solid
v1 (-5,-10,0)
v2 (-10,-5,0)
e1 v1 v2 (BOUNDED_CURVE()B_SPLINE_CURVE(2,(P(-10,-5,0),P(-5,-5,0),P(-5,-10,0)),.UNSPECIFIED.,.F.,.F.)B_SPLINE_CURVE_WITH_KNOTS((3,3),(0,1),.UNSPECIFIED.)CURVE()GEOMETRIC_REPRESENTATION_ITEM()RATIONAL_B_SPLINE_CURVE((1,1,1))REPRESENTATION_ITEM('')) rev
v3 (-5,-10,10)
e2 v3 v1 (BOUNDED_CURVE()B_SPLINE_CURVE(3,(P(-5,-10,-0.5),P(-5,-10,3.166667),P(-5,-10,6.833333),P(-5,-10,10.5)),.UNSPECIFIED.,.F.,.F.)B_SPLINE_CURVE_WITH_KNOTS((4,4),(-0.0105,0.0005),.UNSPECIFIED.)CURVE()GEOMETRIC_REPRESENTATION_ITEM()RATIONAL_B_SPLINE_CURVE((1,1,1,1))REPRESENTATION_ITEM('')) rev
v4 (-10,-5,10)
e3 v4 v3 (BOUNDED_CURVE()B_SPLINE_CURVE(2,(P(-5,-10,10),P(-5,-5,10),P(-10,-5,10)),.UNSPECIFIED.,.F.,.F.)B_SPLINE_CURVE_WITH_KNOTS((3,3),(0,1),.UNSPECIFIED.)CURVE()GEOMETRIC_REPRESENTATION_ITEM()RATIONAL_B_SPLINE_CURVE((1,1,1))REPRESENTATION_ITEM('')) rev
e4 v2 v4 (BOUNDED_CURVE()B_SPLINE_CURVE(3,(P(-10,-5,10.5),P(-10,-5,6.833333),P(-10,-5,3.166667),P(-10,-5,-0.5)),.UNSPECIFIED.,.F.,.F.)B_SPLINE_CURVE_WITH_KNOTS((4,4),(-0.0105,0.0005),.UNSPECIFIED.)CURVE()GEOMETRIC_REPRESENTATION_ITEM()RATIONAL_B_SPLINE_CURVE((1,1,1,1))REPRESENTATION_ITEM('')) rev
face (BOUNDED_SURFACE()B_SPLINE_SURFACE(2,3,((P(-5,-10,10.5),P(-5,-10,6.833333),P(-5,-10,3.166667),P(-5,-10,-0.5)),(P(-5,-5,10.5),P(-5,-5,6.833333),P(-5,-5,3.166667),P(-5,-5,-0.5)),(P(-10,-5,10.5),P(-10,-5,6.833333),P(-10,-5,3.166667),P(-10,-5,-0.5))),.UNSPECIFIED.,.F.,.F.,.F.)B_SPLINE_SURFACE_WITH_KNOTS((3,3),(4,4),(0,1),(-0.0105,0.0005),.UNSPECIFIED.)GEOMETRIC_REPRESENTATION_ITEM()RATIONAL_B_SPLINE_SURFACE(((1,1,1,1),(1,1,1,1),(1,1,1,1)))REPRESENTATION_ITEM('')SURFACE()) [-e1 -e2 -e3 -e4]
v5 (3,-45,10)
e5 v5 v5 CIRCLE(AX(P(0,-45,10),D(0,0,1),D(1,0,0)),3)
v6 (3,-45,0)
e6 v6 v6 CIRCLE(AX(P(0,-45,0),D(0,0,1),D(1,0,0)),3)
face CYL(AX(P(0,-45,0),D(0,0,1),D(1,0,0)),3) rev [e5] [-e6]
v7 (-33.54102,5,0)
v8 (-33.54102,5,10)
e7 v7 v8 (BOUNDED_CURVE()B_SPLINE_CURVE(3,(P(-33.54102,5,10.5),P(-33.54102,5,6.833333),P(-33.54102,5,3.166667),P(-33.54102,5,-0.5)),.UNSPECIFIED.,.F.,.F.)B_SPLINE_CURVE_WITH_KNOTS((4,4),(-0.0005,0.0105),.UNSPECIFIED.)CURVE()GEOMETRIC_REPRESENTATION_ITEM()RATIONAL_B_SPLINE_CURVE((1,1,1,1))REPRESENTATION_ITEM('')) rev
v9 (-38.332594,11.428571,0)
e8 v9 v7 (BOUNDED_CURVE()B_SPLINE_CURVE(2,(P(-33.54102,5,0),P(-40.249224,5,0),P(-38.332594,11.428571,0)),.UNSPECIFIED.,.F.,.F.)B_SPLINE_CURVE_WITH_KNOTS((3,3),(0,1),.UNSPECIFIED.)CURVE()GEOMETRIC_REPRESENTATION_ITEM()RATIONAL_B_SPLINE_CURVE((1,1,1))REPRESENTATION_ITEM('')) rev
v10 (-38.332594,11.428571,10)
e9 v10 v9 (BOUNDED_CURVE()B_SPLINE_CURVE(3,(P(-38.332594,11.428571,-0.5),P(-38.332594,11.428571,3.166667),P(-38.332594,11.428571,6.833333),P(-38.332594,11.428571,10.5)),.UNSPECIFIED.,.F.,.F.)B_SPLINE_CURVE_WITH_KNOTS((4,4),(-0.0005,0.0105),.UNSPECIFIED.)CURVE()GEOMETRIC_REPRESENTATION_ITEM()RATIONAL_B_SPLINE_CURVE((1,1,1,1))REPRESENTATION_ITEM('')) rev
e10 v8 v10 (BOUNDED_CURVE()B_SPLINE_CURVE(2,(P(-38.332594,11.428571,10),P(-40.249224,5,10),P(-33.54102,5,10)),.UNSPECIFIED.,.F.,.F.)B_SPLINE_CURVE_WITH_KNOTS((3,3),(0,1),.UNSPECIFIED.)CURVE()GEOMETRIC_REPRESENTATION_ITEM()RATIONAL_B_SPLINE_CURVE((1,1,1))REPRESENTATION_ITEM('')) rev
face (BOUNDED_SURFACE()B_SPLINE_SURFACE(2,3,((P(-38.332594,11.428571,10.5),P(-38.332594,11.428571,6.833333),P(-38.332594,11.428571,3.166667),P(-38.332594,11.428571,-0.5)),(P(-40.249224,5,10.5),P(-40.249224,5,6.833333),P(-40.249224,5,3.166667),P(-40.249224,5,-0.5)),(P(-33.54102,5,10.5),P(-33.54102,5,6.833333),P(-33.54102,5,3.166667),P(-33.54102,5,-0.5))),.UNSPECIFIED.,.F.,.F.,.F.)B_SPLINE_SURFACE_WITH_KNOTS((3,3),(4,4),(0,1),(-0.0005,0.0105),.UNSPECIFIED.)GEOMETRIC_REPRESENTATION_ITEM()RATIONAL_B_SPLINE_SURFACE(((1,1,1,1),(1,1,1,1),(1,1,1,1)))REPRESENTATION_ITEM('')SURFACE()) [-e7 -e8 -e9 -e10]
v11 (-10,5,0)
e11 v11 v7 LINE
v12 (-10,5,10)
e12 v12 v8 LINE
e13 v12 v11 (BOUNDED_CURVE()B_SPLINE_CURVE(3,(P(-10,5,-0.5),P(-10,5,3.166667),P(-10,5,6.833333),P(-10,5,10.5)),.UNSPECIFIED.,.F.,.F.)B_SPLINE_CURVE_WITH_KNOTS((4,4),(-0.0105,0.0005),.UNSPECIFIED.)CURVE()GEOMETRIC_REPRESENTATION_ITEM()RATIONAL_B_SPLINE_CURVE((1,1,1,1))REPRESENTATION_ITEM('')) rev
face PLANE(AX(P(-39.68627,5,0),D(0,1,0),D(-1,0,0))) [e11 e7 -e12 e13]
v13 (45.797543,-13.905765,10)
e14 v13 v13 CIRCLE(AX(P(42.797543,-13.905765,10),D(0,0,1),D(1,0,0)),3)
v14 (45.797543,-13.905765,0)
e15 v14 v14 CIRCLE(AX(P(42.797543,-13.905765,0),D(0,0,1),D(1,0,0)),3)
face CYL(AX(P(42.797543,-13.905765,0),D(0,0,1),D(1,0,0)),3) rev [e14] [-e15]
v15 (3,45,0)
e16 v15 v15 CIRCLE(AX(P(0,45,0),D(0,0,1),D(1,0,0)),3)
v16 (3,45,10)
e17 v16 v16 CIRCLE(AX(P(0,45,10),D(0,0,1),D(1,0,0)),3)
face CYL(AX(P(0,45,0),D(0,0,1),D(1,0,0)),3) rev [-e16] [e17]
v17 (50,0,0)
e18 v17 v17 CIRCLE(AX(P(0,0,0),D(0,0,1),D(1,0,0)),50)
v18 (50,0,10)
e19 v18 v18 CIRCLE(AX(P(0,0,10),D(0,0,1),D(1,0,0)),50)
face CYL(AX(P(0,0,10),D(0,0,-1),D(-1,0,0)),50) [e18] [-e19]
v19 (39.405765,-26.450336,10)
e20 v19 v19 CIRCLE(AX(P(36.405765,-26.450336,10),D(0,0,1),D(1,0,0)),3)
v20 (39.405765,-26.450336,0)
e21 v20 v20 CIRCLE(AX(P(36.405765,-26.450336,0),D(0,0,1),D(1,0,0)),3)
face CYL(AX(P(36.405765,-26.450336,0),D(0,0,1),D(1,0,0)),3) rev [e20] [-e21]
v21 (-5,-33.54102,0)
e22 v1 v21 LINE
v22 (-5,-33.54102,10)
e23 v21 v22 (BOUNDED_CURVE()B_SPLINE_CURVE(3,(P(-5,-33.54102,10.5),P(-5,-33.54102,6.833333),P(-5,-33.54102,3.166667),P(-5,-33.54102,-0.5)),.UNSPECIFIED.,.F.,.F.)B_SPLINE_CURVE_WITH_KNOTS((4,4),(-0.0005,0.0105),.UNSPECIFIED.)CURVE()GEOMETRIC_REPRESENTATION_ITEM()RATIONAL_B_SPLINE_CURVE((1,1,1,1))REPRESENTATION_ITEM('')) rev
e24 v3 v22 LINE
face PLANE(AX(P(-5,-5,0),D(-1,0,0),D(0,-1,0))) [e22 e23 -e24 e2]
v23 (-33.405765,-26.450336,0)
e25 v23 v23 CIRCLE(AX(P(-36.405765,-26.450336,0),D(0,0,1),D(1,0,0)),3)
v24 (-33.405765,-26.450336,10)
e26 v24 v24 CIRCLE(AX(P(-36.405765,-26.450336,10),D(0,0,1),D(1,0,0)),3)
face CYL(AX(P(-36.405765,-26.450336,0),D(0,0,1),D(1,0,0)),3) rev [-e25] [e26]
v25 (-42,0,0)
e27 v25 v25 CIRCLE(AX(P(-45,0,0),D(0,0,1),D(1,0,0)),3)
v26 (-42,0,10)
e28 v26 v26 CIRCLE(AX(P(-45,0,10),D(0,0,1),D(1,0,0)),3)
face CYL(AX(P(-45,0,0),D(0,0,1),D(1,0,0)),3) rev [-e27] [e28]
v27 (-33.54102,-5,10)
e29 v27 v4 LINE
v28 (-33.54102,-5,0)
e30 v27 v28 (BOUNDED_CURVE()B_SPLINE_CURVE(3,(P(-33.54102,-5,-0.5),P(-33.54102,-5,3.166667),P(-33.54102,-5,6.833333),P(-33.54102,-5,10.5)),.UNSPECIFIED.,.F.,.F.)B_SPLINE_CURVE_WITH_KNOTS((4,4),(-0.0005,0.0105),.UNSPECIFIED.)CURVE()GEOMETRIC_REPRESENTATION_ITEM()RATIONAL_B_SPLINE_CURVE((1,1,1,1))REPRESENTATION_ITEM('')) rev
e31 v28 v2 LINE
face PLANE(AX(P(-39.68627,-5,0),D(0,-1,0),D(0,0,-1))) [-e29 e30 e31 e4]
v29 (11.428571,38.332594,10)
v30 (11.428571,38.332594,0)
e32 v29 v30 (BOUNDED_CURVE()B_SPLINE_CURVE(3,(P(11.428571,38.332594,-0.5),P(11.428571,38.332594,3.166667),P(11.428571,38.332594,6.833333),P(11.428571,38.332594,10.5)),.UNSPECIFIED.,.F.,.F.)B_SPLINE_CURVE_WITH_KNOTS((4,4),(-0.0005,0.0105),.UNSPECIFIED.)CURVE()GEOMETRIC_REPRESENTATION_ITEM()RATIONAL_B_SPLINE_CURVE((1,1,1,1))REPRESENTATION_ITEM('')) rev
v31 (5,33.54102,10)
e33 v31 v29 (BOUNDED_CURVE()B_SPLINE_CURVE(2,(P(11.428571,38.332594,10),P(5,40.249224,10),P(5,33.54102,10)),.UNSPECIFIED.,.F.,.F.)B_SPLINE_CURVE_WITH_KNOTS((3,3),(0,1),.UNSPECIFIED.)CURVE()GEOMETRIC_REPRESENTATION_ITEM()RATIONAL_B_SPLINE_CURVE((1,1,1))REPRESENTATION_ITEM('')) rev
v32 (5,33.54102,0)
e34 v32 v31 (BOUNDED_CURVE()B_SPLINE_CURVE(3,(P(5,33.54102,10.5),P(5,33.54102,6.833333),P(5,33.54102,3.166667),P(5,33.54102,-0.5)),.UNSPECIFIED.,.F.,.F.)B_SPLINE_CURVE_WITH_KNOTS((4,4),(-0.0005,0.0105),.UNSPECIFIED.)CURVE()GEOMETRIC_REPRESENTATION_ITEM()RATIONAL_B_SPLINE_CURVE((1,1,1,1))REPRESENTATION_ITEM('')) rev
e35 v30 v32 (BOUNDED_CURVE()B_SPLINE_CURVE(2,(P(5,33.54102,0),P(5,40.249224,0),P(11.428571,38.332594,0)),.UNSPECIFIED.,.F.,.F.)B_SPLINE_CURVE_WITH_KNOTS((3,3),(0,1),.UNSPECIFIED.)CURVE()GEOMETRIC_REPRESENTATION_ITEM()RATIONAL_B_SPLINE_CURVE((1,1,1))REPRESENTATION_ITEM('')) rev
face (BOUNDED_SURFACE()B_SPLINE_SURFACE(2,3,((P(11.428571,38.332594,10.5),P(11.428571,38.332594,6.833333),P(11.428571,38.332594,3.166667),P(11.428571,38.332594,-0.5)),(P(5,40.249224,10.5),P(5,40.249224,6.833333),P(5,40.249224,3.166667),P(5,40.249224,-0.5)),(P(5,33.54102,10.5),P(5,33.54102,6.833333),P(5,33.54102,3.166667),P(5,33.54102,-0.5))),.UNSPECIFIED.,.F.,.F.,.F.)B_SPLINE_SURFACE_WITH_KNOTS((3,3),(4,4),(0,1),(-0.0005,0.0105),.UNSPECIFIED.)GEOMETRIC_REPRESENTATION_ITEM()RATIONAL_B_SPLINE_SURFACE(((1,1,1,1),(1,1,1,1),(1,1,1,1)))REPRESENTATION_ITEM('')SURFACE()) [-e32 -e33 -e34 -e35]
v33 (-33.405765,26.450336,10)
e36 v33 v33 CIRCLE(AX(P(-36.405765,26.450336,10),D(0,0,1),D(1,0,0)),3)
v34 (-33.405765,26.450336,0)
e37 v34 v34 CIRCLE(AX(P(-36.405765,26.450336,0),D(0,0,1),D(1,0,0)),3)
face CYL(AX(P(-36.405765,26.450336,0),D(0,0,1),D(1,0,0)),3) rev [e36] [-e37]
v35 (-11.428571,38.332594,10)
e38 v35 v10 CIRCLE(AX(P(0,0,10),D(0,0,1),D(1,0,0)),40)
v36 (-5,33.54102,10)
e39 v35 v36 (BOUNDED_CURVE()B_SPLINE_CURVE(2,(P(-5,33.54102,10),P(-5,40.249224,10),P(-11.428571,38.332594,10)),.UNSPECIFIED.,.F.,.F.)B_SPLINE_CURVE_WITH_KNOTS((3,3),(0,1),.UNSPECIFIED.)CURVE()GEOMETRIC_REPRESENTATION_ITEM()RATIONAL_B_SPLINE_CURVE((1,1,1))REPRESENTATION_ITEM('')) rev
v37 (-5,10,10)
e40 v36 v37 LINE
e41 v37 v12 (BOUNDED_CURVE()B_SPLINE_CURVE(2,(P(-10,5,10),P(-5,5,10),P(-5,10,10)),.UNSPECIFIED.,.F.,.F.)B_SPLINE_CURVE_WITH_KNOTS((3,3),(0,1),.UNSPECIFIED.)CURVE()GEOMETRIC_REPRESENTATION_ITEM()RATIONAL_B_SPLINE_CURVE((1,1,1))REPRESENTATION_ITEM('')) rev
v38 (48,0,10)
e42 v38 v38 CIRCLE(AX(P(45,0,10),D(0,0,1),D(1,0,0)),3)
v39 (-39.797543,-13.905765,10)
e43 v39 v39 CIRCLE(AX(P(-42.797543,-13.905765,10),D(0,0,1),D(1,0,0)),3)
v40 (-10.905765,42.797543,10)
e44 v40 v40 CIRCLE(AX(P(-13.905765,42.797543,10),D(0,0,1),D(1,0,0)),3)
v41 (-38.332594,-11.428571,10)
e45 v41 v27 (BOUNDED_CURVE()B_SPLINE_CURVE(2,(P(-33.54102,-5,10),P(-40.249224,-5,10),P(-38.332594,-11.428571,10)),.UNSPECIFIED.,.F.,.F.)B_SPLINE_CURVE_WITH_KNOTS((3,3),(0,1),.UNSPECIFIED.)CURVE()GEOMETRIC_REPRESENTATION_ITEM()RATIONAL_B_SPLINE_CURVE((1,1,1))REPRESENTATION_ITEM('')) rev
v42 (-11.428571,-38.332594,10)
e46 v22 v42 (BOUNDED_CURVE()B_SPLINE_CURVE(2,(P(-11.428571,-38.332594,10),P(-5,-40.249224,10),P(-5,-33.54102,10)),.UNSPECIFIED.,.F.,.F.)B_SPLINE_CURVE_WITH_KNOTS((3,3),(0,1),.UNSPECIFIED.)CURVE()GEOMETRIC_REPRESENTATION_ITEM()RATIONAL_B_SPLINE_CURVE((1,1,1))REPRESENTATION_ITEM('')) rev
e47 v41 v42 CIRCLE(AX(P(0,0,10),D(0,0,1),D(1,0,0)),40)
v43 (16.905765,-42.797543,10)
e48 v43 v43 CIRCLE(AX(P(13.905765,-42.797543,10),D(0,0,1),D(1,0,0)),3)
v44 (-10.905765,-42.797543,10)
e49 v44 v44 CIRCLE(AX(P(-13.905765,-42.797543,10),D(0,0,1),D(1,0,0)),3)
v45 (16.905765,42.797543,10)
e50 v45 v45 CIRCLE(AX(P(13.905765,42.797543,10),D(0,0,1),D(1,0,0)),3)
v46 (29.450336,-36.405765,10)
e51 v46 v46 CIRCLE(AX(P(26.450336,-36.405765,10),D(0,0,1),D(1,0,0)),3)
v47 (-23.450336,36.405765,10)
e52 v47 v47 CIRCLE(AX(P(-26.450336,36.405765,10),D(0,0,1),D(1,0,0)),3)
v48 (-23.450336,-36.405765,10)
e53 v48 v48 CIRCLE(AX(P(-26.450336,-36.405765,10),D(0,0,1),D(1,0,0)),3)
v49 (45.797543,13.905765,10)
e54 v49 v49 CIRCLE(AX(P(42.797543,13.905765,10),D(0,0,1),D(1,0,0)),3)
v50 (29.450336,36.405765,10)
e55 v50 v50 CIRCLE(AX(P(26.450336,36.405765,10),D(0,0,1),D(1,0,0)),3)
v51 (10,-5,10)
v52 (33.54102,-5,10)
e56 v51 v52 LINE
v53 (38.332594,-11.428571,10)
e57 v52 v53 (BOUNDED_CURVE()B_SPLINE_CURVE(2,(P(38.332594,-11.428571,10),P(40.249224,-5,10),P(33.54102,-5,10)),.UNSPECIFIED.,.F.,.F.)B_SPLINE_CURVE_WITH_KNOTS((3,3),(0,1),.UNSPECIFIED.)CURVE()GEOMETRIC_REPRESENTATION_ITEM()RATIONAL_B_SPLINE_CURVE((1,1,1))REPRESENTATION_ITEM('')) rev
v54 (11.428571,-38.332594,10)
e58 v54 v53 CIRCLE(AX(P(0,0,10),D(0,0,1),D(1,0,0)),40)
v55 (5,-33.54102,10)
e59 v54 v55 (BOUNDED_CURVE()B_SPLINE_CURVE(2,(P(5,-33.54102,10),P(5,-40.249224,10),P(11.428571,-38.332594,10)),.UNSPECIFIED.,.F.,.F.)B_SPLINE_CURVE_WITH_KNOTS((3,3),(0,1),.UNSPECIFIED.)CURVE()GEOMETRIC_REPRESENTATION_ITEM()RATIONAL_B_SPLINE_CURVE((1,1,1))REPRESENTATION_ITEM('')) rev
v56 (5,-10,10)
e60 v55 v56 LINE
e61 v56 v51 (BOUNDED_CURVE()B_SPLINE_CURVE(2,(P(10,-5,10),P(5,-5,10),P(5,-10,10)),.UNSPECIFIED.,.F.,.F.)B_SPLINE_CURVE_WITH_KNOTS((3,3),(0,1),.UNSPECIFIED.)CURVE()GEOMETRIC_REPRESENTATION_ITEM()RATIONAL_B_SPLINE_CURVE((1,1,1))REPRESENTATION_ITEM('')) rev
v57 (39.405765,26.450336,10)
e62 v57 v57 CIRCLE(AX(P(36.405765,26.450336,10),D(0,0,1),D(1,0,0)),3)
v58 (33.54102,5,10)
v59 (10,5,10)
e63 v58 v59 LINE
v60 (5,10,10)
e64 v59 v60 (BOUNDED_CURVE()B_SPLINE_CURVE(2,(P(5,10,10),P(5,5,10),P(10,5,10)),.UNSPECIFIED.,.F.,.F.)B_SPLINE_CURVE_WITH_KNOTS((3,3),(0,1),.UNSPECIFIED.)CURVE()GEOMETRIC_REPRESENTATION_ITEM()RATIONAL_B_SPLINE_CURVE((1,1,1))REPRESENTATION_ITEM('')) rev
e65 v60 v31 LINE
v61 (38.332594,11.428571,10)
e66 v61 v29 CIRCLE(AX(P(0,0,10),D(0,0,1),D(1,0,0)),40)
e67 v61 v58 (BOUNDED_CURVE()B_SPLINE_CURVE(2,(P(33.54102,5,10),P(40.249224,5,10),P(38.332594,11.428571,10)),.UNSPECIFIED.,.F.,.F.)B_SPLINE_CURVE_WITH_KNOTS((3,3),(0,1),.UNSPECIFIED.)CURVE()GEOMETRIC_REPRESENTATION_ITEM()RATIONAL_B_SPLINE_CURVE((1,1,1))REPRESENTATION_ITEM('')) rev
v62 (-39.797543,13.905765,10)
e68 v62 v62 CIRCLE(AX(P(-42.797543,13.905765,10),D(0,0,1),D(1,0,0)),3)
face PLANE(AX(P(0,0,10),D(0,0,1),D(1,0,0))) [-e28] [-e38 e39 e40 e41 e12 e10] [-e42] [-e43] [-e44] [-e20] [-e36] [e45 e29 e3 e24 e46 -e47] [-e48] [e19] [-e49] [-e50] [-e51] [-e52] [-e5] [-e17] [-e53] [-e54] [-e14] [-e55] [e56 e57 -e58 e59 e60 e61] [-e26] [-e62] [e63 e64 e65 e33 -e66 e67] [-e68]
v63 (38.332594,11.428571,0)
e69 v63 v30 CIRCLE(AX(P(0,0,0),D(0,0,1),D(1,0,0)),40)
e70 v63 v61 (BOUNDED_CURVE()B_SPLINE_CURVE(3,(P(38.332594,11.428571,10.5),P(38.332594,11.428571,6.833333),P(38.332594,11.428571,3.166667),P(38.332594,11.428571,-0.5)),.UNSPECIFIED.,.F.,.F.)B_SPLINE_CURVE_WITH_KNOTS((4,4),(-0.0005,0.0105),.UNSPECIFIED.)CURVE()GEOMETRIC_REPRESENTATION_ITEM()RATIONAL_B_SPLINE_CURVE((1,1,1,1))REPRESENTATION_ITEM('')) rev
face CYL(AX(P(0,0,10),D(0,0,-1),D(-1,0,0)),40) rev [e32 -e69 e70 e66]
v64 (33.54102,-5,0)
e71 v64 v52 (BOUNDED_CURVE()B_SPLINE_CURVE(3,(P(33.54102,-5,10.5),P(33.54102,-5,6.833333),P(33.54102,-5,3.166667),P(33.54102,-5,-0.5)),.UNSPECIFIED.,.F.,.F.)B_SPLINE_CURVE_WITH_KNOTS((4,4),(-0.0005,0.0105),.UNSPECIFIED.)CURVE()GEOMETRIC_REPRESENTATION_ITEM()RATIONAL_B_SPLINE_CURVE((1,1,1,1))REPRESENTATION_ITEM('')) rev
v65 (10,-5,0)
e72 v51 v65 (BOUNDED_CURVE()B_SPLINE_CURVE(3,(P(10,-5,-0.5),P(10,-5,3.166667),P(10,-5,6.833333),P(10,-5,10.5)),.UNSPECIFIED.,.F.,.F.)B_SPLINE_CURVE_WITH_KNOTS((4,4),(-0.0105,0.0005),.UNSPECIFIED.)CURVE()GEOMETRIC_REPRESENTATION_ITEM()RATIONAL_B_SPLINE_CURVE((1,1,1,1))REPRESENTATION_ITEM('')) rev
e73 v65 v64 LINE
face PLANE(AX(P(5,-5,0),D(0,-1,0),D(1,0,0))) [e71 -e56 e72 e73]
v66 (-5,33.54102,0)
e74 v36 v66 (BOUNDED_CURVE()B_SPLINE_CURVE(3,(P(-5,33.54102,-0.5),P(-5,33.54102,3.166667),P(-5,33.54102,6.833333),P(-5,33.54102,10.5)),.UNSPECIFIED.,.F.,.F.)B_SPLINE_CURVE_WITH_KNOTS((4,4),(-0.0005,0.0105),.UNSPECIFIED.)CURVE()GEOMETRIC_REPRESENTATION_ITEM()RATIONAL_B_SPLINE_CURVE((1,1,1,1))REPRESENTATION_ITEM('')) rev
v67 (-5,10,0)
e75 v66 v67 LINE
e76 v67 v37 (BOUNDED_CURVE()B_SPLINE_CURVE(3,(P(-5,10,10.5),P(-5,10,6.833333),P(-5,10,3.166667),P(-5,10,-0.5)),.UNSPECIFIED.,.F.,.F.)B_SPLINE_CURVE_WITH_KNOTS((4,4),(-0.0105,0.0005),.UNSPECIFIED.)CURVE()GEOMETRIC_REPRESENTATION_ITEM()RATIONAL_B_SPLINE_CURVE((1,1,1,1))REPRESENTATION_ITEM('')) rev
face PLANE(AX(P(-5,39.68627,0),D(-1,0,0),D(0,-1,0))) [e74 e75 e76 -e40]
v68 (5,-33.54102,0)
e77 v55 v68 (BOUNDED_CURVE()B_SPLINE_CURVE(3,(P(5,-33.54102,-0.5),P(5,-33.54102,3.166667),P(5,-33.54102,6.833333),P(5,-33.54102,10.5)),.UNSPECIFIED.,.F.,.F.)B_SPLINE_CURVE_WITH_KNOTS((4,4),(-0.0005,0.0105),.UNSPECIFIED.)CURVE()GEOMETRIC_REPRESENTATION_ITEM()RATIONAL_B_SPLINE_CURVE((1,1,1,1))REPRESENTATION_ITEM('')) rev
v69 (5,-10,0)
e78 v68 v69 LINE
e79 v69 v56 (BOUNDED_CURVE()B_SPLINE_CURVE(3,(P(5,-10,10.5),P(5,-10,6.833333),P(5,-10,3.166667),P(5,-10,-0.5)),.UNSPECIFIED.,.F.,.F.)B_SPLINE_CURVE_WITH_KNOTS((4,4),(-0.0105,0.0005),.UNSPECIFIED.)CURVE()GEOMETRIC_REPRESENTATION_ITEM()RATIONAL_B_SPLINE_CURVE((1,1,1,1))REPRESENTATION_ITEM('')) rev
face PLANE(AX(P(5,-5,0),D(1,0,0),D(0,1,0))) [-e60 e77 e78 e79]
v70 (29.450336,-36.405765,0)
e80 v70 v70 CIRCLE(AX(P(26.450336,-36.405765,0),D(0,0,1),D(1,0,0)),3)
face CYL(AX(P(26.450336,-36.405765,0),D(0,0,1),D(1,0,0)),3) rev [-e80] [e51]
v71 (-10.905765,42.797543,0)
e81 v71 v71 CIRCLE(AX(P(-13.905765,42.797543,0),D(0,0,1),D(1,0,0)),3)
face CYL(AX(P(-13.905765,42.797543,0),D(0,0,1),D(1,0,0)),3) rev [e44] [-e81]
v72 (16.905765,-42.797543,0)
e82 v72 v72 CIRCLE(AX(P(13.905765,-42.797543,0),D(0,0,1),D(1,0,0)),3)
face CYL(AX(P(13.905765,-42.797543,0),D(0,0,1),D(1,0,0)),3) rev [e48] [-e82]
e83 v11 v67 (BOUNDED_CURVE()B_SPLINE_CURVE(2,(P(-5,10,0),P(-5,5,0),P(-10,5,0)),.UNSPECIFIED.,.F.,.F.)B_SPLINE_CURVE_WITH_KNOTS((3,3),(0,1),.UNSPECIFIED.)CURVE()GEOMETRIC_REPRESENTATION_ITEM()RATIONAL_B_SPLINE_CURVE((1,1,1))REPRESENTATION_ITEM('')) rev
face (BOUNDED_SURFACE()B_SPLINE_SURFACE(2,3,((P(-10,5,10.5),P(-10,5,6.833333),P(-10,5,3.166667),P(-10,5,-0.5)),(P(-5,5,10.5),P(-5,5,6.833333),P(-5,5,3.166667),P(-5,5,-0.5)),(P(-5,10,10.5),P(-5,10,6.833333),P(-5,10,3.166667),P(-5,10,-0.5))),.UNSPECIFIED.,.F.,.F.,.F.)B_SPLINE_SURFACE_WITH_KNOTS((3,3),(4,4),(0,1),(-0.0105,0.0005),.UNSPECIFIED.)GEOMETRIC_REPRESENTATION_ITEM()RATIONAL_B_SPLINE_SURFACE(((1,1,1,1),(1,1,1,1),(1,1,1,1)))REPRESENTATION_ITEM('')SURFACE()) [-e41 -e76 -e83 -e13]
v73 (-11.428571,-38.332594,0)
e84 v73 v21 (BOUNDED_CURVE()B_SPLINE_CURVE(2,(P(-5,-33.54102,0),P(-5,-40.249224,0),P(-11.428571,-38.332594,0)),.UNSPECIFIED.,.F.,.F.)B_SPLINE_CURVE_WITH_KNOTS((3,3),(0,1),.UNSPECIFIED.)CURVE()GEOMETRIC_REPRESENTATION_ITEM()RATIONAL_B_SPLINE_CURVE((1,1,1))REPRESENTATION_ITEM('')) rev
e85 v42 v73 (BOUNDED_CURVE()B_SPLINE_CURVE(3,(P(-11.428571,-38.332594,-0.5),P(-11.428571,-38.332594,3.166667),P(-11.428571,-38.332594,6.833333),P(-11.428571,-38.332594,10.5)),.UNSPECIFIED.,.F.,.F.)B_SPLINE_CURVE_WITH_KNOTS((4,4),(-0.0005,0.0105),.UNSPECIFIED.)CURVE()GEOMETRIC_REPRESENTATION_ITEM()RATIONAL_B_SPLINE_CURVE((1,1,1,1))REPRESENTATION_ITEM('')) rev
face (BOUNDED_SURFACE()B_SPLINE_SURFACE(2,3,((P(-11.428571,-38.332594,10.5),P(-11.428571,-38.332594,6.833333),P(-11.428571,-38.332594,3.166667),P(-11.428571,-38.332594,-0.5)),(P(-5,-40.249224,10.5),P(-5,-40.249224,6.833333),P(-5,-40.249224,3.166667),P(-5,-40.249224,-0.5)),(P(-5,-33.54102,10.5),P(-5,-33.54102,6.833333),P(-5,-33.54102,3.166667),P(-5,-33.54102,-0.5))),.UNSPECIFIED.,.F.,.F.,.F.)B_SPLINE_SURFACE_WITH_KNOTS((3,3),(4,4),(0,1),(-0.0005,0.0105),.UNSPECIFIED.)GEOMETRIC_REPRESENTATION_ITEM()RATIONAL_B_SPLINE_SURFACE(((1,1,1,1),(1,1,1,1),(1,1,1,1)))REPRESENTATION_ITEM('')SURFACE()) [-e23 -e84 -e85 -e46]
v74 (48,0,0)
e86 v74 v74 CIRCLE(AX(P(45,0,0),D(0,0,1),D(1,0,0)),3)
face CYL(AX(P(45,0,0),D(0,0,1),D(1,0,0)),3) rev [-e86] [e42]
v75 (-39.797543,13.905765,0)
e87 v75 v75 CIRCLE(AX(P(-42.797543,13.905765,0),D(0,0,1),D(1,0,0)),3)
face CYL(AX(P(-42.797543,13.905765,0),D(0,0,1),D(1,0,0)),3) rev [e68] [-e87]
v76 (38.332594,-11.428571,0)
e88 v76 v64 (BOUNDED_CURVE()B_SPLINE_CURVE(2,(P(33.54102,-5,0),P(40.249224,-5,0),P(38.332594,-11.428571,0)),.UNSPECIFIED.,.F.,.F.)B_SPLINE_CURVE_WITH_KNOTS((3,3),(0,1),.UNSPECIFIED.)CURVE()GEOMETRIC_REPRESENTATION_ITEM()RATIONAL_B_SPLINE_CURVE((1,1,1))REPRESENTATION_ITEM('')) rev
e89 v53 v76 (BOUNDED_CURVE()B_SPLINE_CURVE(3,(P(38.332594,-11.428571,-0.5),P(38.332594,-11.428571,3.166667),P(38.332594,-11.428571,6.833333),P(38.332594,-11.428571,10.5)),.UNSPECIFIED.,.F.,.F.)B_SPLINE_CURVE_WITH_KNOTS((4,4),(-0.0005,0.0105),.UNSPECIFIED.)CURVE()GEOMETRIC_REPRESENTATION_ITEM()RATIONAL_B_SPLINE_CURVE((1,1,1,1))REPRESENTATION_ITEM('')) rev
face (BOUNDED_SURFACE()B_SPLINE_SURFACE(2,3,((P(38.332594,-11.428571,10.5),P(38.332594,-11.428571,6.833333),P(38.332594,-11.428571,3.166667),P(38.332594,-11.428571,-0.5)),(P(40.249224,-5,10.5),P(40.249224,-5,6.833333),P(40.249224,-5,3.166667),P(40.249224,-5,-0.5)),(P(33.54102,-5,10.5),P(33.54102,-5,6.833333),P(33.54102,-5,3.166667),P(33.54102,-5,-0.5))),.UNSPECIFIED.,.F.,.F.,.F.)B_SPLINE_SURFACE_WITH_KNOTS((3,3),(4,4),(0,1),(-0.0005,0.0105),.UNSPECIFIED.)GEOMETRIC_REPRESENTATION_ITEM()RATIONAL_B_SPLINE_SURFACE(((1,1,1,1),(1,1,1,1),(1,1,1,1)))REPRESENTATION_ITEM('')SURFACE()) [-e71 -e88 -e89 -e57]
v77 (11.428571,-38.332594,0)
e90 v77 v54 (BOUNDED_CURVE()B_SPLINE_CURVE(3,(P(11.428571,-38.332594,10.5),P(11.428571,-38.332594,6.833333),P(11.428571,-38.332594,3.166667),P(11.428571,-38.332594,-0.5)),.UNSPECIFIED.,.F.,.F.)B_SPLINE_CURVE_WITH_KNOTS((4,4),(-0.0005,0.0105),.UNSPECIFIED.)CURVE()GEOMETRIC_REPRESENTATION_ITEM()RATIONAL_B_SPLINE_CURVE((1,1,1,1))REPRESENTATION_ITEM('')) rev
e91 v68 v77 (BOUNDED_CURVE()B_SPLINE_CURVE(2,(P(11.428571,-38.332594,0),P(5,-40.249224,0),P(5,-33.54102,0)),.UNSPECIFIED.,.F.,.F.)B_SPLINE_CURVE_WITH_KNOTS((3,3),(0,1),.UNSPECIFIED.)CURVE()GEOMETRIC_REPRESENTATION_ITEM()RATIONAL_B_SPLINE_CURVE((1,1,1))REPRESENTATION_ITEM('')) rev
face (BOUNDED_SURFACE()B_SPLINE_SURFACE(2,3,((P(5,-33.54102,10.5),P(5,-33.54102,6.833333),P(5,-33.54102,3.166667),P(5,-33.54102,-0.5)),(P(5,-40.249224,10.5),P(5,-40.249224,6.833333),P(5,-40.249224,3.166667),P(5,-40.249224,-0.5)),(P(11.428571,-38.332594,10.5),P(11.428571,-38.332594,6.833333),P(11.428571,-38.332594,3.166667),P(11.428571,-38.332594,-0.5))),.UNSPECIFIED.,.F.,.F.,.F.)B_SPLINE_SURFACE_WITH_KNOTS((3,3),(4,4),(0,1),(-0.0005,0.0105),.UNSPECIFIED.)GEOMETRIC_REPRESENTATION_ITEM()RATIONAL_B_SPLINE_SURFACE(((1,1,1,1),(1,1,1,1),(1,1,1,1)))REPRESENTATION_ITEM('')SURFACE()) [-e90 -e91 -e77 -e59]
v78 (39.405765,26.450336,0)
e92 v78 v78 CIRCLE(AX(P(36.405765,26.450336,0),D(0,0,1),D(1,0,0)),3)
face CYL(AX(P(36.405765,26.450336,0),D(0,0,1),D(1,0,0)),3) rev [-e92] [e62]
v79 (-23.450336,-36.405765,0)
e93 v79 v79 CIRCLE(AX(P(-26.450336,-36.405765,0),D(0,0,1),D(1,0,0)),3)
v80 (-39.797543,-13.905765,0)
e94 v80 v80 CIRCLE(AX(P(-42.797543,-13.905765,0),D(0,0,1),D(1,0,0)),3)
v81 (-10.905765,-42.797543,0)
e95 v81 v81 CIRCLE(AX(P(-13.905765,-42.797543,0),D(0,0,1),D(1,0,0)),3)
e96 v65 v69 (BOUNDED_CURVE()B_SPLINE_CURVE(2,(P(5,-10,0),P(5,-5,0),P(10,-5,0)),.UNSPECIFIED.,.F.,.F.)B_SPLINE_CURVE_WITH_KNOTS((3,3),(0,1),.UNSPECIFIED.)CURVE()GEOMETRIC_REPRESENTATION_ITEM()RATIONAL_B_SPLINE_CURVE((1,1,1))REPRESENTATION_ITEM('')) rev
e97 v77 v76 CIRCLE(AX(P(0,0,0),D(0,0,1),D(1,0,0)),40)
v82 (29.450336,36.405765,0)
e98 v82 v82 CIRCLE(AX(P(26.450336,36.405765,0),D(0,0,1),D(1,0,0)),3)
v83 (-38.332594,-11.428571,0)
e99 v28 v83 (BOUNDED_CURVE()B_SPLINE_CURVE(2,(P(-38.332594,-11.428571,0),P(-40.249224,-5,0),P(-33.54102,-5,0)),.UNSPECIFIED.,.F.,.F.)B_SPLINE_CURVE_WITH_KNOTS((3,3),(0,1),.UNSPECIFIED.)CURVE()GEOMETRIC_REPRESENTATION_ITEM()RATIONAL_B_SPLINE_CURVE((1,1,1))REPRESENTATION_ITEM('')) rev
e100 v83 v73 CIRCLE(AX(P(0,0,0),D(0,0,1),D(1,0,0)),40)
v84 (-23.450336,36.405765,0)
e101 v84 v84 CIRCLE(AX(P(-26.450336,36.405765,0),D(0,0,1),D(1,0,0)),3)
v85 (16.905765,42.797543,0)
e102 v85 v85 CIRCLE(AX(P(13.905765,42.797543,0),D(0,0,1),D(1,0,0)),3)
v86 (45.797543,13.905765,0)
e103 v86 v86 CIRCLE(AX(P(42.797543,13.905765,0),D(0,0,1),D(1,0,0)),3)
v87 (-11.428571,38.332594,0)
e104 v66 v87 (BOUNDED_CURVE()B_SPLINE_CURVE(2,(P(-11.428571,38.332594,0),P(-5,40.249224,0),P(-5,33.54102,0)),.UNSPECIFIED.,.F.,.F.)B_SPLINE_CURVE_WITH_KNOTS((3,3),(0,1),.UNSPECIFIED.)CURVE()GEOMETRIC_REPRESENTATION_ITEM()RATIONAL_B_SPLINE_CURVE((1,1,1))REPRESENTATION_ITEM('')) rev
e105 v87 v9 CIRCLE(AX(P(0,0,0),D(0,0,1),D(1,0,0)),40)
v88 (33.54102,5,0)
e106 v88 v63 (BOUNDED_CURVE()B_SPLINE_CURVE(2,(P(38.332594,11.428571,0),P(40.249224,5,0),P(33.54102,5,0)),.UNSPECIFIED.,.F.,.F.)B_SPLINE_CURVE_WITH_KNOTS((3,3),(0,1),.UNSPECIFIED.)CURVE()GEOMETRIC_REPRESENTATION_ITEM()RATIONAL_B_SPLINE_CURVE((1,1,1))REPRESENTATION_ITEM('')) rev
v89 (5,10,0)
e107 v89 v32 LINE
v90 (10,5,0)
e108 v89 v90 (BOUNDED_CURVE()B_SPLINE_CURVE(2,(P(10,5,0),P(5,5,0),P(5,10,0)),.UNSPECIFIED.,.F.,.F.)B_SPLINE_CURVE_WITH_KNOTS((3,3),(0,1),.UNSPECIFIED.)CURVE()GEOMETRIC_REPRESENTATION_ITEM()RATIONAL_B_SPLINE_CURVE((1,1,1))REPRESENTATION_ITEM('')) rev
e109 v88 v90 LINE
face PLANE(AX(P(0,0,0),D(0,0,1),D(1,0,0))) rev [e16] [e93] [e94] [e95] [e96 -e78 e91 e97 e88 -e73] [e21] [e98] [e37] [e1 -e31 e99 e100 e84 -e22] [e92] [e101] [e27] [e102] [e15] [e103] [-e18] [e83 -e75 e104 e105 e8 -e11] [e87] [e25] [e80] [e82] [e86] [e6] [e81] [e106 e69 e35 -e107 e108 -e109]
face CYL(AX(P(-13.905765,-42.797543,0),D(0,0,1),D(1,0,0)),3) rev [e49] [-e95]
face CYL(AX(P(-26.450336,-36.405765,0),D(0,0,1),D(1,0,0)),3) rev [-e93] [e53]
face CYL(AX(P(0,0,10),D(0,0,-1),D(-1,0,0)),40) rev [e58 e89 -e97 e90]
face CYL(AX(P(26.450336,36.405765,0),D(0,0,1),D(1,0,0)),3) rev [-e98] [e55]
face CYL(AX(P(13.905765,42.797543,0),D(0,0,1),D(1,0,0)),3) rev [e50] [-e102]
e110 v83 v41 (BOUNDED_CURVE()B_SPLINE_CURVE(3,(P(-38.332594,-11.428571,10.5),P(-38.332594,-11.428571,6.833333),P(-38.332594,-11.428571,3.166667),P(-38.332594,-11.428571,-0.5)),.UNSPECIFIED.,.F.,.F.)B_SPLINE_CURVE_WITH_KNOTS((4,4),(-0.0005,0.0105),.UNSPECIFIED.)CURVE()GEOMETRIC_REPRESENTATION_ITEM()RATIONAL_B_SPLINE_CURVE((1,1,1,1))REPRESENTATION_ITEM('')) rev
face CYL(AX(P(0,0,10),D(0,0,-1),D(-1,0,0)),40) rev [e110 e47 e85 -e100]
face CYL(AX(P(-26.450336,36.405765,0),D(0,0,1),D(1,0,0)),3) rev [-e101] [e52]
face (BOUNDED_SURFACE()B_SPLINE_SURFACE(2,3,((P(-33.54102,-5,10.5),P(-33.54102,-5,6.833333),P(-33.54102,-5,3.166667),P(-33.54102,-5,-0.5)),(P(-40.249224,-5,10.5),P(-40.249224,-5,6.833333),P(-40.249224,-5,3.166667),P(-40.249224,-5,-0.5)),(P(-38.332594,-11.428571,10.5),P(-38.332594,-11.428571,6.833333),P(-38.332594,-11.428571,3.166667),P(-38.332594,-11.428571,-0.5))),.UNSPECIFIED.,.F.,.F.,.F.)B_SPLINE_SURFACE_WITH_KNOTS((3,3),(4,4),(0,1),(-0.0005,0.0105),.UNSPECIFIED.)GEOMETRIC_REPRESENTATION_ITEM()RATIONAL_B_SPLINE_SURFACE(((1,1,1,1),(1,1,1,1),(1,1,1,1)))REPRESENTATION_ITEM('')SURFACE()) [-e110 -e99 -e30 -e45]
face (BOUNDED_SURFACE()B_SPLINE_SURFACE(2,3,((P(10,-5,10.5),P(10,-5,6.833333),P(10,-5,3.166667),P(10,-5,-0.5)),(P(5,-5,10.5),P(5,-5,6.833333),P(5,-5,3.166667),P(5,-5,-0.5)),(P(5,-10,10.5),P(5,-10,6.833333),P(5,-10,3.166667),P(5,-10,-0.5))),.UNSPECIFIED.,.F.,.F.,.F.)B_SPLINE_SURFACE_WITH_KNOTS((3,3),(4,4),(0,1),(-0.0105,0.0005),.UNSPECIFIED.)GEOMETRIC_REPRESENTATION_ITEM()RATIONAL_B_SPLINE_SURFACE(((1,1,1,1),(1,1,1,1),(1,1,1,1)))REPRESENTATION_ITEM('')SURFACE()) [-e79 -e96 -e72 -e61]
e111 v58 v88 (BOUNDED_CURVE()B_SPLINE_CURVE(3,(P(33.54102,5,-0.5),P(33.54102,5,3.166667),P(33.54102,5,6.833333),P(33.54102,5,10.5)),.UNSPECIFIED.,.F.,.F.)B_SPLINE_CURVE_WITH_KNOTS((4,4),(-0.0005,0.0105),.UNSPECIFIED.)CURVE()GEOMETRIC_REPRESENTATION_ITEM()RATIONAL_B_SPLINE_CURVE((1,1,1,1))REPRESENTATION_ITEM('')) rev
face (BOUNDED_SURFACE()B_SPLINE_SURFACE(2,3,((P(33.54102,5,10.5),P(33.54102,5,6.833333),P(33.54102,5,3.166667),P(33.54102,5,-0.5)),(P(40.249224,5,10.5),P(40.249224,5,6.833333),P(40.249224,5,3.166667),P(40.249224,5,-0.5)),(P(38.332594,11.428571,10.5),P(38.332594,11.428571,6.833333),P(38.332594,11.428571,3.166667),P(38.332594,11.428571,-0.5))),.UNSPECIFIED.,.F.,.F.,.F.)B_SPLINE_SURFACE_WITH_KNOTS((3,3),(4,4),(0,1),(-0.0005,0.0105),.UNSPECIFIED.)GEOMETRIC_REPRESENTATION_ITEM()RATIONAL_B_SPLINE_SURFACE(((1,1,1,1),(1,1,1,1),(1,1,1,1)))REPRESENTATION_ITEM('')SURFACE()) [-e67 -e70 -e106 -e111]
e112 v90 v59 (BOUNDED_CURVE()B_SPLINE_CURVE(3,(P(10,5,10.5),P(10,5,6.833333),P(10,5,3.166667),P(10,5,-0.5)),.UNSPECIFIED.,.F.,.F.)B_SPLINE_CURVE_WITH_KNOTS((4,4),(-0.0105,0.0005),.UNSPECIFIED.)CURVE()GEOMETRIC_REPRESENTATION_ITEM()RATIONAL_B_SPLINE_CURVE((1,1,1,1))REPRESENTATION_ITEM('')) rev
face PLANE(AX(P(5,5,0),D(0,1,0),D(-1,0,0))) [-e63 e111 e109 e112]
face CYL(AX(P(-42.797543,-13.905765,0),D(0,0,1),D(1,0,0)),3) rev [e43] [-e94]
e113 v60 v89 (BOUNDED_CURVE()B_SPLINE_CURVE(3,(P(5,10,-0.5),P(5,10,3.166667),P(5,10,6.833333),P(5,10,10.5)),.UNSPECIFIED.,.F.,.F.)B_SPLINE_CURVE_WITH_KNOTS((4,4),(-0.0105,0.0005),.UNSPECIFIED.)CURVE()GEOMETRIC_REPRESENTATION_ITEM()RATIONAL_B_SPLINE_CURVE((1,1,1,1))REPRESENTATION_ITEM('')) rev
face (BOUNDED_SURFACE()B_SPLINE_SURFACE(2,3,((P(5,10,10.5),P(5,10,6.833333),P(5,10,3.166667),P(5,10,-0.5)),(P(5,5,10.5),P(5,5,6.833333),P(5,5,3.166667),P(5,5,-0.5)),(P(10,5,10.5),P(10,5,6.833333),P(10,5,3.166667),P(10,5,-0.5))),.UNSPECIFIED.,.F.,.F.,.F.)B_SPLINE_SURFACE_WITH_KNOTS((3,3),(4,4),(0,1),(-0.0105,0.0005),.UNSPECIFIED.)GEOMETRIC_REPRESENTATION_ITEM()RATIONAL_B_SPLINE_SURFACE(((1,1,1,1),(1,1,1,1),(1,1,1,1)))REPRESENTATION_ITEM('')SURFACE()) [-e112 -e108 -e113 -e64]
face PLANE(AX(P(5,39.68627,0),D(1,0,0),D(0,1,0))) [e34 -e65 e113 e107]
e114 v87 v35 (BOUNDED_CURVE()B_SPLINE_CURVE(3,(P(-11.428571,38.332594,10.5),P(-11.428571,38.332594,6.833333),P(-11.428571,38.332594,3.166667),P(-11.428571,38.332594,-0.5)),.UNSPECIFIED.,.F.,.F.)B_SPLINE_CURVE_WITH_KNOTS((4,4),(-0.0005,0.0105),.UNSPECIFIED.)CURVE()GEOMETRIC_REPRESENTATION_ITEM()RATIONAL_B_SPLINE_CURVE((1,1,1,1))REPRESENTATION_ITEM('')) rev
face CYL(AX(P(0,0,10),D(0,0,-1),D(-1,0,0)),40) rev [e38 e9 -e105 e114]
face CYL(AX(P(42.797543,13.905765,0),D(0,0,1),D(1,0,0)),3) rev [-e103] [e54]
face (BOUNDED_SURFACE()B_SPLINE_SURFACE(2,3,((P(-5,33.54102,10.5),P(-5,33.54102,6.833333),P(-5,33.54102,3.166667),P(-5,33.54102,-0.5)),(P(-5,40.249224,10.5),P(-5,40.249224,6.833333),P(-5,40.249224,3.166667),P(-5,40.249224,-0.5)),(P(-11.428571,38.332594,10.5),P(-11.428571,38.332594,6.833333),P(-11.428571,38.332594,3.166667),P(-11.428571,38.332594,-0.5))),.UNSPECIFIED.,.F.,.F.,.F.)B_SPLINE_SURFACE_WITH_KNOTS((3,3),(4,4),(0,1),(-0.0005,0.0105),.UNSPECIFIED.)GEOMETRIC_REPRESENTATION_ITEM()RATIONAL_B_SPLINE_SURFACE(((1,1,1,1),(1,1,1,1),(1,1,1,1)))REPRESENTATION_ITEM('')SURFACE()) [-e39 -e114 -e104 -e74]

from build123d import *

# Parameters (mm, degrees)
ESBO_O1_R                = 50
ESBO_O1_R_2              = 40
RESSALTO_EXTRUS_O1_DEPTH = 10
ESBO_O2_R                = 3
CORTE_EXTRUS_O1_DEPTH    = 10
RESSALTO_EXTRUS_O2_START = -10
RESSALTO_EXTRUS_O2_DEPTH = 10
FILETE3_SIZE             = 5


with BuildPart() as part:
    # Esboço1 → Ressalto-extrusão1 (new body)
    with BuildSketch(Plane.XY):
        Circle(ESBO_O1_R)
        Circle(ESBO_O1_R_2, mode=Mode.SUBTRACT)
    extrude(amount=RESSALTO_EXTRUS_O1_DEPTH)

    # Esboço2 → Corte-extrusão1 (cut)
    with BuildSketch(Plane.XY.offset(10)):
        with Locations((45, 0)):
            Circle(ESBO_O2_R)
        with Locations((42.797543233, -13.905764747)):
            Circle(ESBO_O2_R)
        with Locations((36.405764747, -26.450336353)):
            Circle(ESBO_O2_R)
        with Locations((26.450336353, -36.405764747)):
            Circle(ESBO_O2_R)
        with Locations((13.905764747, -42.797543233)):
            Circle(ESBO_O2_R)
        with Locations((0, -45)):
            Circle(ESBO_O2_R)
        with Locations((-13.905764747, -42.797543233)):
            Circle(ESBO_O2_R)
        with Locations((-26.450336353, -36.405764747)):
            Circle(ESBO_O2_R)
        with Locations((-36.405764747, -26.450336353)):
            Circle(ESBO_O2_R)
        with Locations((-42.797543233, -13.905764747)):
            Circle(ESBO_O2_R)
        with Locations((-45, 0)):
            Circle(ESBO_O2_R)
        with Locations((-42.797543233, 13.905764747)):
            Circle(ESBO_O2_R)
        with Locations((-36.405764747, 26.450336353)):
            Circle(ESBO_O2_R)
        with Locations((-26.450336353, 36.405764747)):
            Circle(ESBO_O2_R)
        with Locations((-13.905764747, 42.797543233)):
            Circle(ESBO_O2_R)
        with Locations((0, 45)):
            Circle(ESBO_O2_R)
        with Locations((13.905764747, 42.797543233)):
            Circle(ESBO_O2_R)
        with Locations((26.450336353, 36.405764747)):
            Circle(ESBO_O2_R)
        with Locations((36.405764747, 26.450336353)):
            Circle(ESBO_O2_R)
        with Locations((42.797543233, 13.905764747)):
            Circle(ESBO_O2_R)
    extrude(amount=-CORTE_EXTRUS_O1_DEPTH, mode=Mode.SUBTRACT)

    # Esboço3 → Ressalto-extrusão2 (add)
    with BuildSketch(Plane.XY.offset(10).offset(RESSALTO_EXTRUS_O2_START)):
        with BuildLine():
            Line((-39.686269666, -5), (-5, -5))
            Line((-5, -5), (-5, -39.686269666))
            ThreePointArc((-5, -39.686269666), (0, -40), (5, -39.686269666))
            Line((5, -39.686269666), (5, -5))
            Line((5, -5), (39.686269666, -5))
            ThreePointArc((39.686269666, -5), (40, 0), (39.686269666, 5))
            Line((39.686269666, 5), (5, 5))
            Line((5, 5), (5, 39.686269666))
            ThreePointArc((5, 39.686269666), (0, 40), (-5, 39.686269666))
            Line((-5, 39.686269666), (-5, 5))
            Line((-5, 5), (-39.686269666, 5))
            ThreePointArc((-39.686269666, 5), (-40, 0), (-39.686269666, -5))
        make_face()
    extrude(amount=RESSALTO_EXTRUS_O2_DEPTH)

    # Filete3
    # a fillet whose section is not a circle: 5 mm, written as the material it adds along each edge
    with BuildSketch(Plane(origin=(-39.686269666, -5, 0), x_dir=(0.20605308678190473, -0.9785408143903089, 0), z_dir=(0, 0, 1)), Plane(origin=(39.686269666, 5, 0), x_dir=(-0.206053086781907, 0.9785408143903084, 0), z_dir=(0, 0, 1)), Plane(origin=(5, -39.686269666, 0), x_dir=(0.9785408143903085, 0.2060530867819072, 0), z_dir=(0, 0, 1)), Plane(origin=(-5, 39.686269666, 0), x_dir=(-0.9785408143903084, -0.206053086781907, 0), z_dir=(0, 0, 1))) as filete3_piece_1:
        with BuildLine():
            Bezier((6.569548591, 0), (-0.115998395, -0.550873396), (1.266247732, 6.013377943), weights=[1, 1, 1])
            Line((1.266247732, 6.013377943), (0, 0))
            ThreePointArc((0, 0), (3.284774296, -0.135099927), (6.569548591, 0))
        make_face()
    extrude(amount=10)
    with BuildSketch(Plane(origin=(5, 5, 0), x_dir=(1, 0, 0), z_dir=(0, 0, 1)), Plane(origin=(5, -5, 0), x_dir=(0, -1, 0), z_dir=(0, 0, 1)), Plane(origin=(-5, -5, 0), x_dir=(-1, 0, 0), z_dir=(0, 0, 1)), Plane(origin=(-5, 5, 0), x_dir=(0, 1, 0), z_dir=(0, 0, 1))) as filete3_piece_2:
        with BuildLine():
            Bezier((FILETE3_SIZE, 0), (0, 0), (0, FILETE3_SIZE), weights=[1, 1, 1])
            Line((0, FILETE3_SIZE), (0, 0))
            Line((0, 0), (FILETE3_SIZE, 0))
        make_face()
    extrude(amount=10)
    with BuildSketch(Plane(origin=(5, 39.686269666, 0), x_dir=(0.9785408143903086, -0.20605308678190615, 0), z_dir=(0, 0, 1)), Plane(origin=(-5, -39.686269666, 0), x_dir=(-0.9785408143903087, 0.20605308678190526, 0), z_dir=(0, 0, 1)), Plane(origin=(39.686269666, -5, 0), x_dir=(-0.20605308678190642, -0.9785408143903086, 0), z_dir=(0, 0, 1)), Plane(origin=(-39.686269666, 5, 0), x_dir=(0.206053086781904, 0.9785408143903089, 0), z_dir=(0, 0, 1))) as filete3_piece_3:
        with BuildLine():
            Bezier((6.569548591, 0), (-0.115998395, 0.550873396), (1.266247732, -6.013377943), weights=[1, 1, 1])
            Line((1.266247732, -6.013377943), (0, 0))
            ThreePointArc((0, 0), (3.284774296, 0.135099927), (6.569548591, 0))
        make_face()
    extrude(amount=10)


solid = part.part
